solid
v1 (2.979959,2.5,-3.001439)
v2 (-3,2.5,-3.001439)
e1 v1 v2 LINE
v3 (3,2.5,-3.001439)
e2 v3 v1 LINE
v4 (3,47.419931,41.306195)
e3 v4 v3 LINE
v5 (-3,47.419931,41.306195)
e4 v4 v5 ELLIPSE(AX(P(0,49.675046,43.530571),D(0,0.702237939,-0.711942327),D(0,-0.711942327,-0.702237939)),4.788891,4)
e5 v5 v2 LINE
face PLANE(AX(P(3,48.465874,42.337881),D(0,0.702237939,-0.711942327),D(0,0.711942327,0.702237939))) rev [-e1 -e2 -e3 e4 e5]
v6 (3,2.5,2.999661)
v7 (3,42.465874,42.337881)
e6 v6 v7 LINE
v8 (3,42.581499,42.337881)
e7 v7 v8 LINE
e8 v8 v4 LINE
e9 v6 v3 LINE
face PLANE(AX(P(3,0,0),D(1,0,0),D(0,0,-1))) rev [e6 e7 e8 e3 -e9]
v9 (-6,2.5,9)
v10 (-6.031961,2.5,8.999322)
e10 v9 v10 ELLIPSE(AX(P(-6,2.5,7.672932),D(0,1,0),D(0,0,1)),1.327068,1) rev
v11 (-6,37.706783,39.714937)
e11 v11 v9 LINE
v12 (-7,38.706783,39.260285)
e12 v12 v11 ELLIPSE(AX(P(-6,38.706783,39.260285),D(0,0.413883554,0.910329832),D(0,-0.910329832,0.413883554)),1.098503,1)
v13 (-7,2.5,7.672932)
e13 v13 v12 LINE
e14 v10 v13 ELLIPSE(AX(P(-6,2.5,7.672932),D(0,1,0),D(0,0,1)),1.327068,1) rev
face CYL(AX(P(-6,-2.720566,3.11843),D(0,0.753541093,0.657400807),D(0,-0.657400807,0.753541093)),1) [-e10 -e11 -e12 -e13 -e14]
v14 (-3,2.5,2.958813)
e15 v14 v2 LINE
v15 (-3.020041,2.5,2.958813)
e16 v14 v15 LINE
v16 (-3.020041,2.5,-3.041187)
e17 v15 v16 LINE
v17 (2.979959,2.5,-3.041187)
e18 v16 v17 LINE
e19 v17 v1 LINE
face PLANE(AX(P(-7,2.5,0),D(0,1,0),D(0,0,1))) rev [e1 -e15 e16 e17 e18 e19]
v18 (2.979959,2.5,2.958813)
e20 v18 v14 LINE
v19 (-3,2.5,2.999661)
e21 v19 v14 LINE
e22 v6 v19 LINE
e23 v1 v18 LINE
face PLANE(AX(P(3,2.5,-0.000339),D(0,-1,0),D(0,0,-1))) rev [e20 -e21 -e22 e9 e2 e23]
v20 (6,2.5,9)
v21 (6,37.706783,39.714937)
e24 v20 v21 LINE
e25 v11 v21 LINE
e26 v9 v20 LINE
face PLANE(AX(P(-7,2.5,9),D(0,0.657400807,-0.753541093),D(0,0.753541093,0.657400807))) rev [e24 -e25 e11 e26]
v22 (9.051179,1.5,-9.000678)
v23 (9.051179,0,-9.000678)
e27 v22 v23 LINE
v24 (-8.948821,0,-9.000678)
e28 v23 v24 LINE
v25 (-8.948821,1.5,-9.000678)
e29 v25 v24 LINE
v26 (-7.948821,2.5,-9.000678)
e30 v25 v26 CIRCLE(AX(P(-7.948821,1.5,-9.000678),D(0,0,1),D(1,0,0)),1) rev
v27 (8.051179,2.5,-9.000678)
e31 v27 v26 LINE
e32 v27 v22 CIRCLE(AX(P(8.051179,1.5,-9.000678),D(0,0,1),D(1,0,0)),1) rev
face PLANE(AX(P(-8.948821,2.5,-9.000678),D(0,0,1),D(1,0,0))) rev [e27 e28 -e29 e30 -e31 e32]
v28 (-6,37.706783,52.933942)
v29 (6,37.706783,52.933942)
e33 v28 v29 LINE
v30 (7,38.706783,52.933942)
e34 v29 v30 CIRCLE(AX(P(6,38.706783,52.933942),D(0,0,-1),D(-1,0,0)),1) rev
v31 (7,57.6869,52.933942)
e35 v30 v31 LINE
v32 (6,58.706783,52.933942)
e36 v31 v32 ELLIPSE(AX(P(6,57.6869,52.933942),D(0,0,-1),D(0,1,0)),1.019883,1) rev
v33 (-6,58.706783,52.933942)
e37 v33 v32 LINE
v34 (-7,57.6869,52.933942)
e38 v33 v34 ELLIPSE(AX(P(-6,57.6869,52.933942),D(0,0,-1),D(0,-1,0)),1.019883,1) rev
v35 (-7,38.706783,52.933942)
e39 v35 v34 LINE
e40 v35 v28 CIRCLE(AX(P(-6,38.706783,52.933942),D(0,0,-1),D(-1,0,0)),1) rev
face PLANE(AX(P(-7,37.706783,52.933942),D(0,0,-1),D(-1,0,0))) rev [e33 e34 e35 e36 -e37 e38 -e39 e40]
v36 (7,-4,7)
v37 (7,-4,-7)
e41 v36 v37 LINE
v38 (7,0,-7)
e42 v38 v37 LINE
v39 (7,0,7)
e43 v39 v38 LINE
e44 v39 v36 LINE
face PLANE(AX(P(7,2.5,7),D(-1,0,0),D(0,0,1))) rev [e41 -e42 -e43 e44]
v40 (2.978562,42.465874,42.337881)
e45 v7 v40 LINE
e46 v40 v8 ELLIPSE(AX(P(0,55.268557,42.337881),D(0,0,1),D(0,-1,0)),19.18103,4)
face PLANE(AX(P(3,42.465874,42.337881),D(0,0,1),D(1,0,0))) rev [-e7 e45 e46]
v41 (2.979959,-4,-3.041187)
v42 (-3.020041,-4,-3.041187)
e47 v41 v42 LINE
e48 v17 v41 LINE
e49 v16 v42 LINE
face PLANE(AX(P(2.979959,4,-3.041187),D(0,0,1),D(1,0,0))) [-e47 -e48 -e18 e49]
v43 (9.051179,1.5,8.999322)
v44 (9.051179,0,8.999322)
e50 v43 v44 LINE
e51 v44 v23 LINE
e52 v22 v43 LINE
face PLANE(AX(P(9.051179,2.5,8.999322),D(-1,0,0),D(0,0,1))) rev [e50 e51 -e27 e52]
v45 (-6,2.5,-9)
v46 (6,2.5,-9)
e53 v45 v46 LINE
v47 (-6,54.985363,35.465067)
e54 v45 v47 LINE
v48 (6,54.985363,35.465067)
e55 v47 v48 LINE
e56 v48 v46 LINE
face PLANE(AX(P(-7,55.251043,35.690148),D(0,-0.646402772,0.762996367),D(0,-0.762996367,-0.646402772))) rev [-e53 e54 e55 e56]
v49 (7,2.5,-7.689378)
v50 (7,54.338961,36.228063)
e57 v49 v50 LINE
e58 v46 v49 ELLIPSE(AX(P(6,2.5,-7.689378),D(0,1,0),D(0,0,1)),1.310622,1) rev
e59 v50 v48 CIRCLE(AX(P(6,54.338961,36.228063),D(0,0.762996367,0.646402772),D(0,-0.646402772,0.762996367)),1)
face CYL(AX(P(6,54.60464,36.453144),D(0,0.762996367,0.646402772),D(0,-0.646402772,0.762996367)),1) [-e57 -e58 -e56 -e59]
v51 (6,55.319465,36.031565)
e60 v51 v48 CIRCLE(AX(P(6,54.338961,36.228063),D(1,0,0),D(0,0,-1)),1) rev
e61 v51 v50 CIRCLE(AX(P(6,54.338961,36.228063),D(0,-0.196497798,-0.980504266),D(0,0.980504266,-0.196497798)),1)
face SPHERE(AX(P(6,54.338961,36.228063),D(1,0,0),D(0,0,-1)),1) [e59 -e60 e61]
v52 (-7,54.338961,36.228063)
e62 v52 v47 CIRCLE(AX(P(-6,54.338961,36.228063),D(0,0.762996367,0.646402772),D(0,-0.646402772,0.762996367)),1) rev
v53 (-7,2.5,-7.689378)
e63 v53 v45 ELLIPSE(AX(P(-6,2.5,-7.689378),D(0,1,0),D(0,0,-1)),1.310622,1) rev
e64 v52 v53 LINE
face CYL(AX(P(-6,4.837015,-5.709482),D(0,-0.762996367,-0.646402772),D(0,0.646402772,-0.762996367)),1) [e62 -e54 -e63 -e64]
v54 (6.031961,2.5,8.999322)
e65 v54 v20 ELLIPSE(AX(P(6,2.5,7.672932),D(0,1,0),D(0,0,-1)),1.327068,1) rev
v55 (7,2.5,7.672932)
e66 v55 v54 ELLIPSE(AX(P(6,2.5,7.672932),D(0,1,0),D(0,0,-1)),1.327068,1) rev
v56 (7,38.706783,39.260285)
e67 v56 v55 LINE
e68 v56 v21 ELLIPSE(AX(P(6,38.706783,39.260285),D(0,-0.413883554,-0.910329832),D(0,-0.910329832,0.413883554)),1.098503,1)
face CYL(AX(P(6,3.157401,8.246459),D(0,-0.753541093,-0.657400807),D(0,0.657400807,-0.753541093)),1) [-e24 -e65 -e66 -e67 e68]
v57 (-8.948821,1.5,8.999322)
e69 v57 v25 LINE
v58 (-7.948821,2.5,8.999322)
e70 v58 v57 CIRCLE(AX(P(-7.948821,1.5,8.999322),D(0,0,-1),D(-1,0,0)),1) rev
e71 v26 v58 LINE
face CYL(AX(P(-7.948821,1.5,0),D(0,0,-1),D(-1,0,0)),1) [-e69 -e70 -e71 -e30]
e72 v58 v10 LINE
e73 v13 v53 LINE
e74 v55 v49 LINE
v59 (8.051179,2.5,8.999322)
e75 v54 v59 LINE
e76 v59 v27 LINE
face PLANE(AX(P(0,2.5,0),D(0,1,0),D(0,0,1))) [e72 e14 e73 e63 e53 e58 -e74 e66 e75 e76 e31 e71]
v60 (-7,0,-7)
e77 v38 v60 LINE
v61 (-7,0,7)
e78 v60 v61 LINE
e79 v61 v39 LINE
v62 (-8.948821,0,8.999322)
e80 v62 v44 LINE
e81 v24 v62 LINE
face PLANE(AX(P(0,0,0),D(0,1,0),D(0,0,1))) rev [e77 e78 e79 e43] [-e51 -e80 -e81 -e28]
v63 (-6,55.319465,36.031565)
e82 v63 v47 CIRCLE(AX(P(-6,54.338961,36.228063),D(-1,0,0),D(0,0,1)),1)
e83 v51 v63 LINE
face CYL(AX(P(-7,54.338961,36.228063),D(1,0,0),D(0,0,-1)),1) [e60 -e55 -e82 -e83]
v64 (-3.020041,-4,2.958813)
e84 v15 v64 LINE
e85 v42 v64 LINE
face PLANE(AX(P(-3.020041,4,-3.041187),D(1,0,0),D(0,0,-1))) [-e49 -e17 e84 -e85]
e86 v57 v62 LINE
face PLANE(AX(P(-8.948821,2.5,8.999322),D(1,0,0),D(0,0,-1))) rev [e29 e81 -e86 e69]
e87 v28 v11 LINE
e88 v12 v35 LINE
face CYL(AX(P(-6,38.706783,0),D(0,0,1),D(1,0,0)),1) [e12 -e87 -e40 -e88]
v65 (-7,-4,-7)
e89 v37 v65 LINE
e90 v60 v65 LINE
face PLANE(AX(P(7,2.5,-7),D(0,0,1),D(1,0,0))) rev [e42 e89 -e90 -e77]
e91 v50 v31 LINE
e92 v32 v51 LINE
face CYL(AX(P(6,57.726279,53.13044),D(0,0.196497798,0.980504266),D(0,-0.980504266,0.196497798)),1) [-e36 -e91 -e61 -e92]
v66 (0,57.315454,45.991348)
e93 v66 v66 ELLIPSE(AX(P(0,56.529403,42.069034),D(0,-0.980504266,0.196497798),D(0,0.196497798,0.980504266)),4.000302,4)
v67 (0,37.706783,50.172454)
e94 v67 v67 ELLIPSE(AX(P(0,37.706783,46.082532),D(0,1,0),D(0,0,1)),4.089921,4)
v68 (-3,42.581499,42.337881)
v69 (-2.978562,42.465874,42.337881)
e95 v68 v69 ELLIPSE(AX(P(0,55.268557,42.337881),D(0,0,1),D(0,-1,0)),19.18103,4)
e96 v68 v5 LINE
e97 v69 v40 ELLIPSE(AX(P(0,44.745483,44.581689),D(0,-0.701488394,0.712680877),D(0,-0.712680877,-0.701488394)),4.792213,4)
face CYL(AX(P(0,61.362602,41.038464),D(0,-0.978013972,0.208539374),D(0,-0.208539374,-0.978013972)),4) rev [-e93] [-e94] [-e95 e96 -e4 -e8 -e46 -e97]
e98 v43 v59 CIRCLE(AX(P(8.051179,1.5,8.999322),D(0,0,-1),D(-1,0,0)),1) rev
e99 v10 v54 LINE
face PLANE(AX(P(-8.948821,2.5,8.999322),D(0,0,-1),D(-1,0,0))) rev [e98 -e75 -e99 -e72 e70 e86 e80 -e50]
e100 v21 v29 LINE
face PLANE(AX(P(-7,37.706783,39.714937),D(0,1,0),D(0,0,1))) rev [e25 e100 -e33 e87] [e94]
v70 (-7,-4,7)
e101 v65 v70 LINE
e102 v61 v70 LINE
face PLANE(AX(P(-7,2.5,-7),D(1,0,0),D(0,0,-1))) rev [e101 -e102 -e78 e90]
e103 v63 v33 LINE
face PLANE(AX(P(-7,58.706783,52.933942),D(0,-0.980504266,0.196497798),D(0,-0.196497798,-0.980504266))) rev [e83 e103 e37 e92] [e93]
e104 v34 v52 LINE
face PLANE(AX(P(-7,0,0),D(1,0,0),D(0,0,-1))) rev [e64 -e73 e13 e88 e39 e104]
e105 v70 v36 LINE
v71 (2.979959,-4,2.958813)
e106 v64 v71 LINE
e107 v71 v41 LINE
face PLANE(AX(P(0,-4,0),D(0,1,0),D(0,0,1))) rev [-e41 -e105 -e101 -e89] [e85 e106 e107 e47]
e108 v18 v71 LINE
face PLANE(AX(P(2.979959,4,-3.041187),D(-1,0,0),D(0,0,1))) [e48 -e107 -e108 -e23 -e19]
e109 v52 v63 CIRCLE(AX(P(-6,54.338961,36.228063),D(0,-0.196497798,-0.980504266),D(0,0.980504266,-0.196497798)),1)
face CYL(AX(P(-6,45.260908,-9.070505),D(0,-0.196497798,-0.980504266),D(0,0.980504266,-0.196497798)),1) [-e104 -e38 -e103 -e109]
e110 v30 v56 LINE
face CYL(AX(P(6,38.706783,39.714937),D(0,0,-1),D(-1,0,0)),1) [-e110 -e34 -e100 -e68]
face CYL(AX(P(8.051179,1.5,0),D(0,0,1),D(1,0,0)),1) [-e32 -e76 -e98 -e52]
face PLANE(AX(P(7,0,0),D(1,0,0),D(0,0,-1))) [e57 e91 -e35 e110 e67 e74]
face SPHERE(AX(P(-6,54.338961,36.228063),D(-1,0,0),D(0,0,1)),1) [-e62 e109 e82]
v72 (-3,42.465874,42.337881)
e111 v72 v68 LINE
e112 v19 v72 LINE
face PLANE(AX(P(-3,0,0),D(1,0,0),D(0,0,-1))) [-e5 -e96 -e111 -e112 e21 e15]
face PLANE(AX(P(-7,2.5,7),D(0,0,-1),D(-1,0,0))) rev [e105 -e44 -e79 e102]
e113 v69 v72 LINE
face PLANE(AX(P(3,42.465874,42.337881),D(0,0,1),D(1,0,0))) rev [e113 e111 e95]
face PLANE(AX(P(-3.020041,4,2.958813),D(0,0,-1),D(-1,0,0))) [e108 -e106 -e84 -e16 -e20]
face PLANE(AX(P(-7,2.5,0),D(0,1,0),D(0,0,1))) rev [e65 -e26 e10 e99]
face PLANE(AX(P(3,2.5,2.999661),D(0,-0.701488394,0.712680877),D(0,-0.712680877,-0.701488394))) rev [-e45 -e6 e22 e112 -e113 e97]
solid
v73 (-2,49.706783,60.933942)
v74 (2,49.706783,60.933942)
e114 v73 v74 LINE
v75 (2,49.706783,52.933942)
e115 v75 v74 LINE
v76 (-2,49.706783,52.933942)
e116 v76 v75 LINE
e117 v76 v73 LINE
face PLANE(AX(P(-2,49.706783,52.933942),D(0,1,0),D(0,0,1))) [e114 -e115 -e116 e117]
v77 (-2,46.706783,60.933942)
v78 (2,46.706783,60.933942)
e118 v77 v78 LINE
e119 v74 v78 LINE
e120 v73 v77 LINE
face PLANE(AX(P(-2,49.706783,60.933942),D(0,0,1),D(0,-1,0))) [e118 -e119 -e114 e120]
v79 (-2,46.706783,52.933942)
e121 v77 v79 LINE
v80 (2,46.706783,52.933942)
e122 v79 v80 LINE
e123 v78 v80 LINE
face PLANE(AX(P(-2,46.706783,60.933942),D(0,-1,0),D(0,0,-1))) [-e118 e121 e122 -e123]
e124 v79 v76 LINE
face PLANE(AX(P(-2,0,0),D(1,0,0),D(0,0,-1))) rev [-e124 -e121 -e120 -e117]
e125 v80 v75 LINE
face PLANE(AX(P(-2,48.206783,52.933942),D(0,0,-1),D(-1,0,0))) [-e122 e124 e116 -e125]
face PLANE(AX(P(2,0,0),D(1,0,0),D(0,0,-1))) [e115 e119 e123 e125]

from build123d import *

# Parameters (mm, degrees)
BOSS_EXTRUDE1_DEPTH      = 2.5
BOSS_EXTRUDE1_DEPTH_BACK = 4
SKETCH2_W                = 14
SKETCH2_H                = 14
SKETCH11_W               = 18
SKETCH11_H               = 18
BOSS_EXTRUDE4_DEPTH      = 2.5
CUT_EXTRUDE5_DEPTH       = 4
CUT_EXTRUDE5_DEPTH_BACK  = 4
SKETCH3_W                = 6
SKETCH3_H                = 6
BOSS_EXTRUDE5_DEPTH      = 7
BOSS_EXTRUDE5_DEPTH_BACK = 7
CUT_EXTRUDE8_DEPTH       = 3
CUT_EXTRUDE8_DEPTH_BACK  = 3
CUT_SWEEP4_PROFILE_R     = 4
FILLET1_R                = 1
BOSS_EXTRUDE6_DEPTH      = 2
BOSS_EXTRUDE6_DEPTH_BACK = 2


with BuildPart() as part:
    # Sketch2 → Boss-Extrude1 (new, two sides: drawn at the far end of the back side and taken through both)
    with BuildSketch(Plane(origin=(0, 0, 0), x_dir=(1, 0, 0), z_dir=(0, 1, 0)).offset(-BOSS_EXTRUDE1_DEPTH_BACK)):
        Rectangle(SKETCH2_W, SKETCH2_H)
    extrude(amount=BOSS_EXTRUDE1_DEPTH + BOSS_EXTRUDE1_DEPTH_BACK)

    # Sketch11 → Boss-Extrude4 (add)
    with BuildSketch(Plane(origin=(0, 0, 0), x_dir=(1, 0, 0), z_dir=(0, 1, 0))):
        with Locations((0.051179488, 0.000677961)):
            Rectangle(SKETCH11_W, SKETCH11_H)
    extrude(amount=BOSS_EXTRUDE4_DEPTH)

    # Sketch3 → Cut-Extrude5 (cut, two sides: drawn at the far end of the back side and taken through both)
    with BuildSketch(Plane(origin=(0, 0, 0), x_dir=(1, 0, 0), z_dir=(0, 1, 0)).offset(-CUT_EXTRUDE5_DEPTH_BACK)):
        with Locations((-0.020040697, 0.041186537)):
            Rectangle(SKETCH3_W, SKETCH3_H)
    extrude(amount=CUT_EXTRUDE5_DEPTH + CUT_EXTRUDE5_DEPTH_BACK, mode=Mode.SUBTRACT)

    # Sketch13 → Boss-Extrude5 (add, two sides: drawn at the far end of the back side and taken through both)
    with BuildSketch(Plane(origin=(0, 0, 0), x_dir=(0, 0, -1), z_dir=(1, 0, 0)).offset(-BOSS_EXTRUDE5_DEPTH_BACK)):
        Polygon((-39.714937447, 37.706782945), (-52.933941772, 37.706782945), (-52.933941772, 58.706782945), (-35.69014798, 55.251043253), (9, 2.5), (0, 2.5), (-9, 2.5), align=None)
    extrude(amount=BOSS_EXTRUDE5_DEPTH + BOSS_EXTRUDE5_DEPTH_BACK)

    # Sketch16 → Cut-Extrude8 (cut, two sides: drawn at the far end of the back side and taken through both)
    with BuildSketch(Plane(origin=(0, 0, 0), x_dir=(0, 0, -1), z_dir=(1, 0, 0)).offset(-CUT_EXTRUDE8_DEPTH_BACK)):
        Polygon((0.000338981, 2.5), (3.001438968, 2.5), (-42.337880938, 48.465874453), (-42.337880938, 42.465874453), (-2.999661019, 2.5), align=None)
    extrude(amount=CUT_EXTRUDE8_DEPTH + CUT_EXTRUDE8_DEPTH_BACK, mode=Mode.SUBTRACT)

    # Cut-Sweep4: sweep along a path in Sketch52
    with BuildLine(Plane(origin=(0, 0, 0), x_dir=(0, 0, -1), z_dir=(1, 0, 0))) as cut_sweep4_path:
        Line((-41.038463706, 61.362601787), (-48.816572109, 24.884604602))
    # Cut-Sweep4 profile (on start of the path) → Cut-Sweep4 (sweep, cut)
    with BuildSketch(Plane(origin=(0, 61.362601787, 41.038463706), x_dir=(0, -0.20853937389083857, -0.9780139720562366), z_dir=(0, -0.9780139720562366, 0.20853937389083857))):
        Circle(CUT_SWEEP4_PROFILE_R)
    sweep(path=cut_sweep4_path.line, mode=Mode.SUBTRACT)

    # Fillet1
    # the kernel refuses this fillet: 1 mm, written as the material it takes off along each edge
    with BuildSketch(Plane(origin=(6, 54.338960672, 36.228063112), x_dir=(0, 0.6464027717083677, -0.7629963674407237), z_dir=(1, 0, 0))) as fillet1_piece_1_section:
        Polygon((0, 0), (FILLET1_R * 1.02, 0), (FILLET1_R * 1.02, FILLET1_R * 0.355169980491), (FILLET1_R * 0.799402336859, FILLET1_R * 0.633526561262), align=None)
    fillet1_piece_1 = extrude(amount=FILLET1_R * 1.02, mode=Mode.PRIVATE)
    fillet1_piece_1 = fillet1_piece_1 - Plane(origin=(6, 54.338960672, 36.228063112), x_dir=(0, -0.8613575242057089, 0.5079992278480466), z_dir=(1, 0, 0)) * Sphere(FILLET1_R, mode=Mode.PRIVATE)
    add(fillet1_piece_1, mode=Mode.SUBTRACT)
    with BuildSketch(Plane(origin=(-6, 54.338960672, 36.228063112), x_dir=(0, 0.9805042658587001, -0.1964977980357328), z_dir=(-1, 0, 0))) as fillet1_piece_2_section:
        Polygon((0, 0), (FILLET1_R * 1.02, 0), (FILLET1_R * 1.02, FILLET1_R * 0.355169980491), (FILLET1_R * 0.799402336859, FILLET1_R * 0.633526561262), align=None)
    fillet1_piece_2 = extrude(amount=FILLET1_R * 1.02, mode=Mode.PRIVATE)
    fillet1_piece_2 = fillet1_piece_2 - Plane(origin=(-6, 54.338960672, 36.228063112), x_dir=(0, -0.8613575242057089, 0.5079992278480466), z_dir=(-1, 0, 0)) * Sphere(FILLET1_R, mode=Mode.PRIVATE)
    add(fillet1_piece_2, mode=Mode.SUBTRACT)
    with BuildSketch(Plane(origin=(-8.948820512, 2.5, 8.999322039), x_dir=(1, 0, 0), z_dir=(0, 0, -1)), Plane(origin=(9.051179488, 2.5, -9.000677961), x_dir=(-1, 0, 0), z_dir=(0, 0, 1))) as fillet1_piece_3:
        with BuildLine():
            CenterArc((FILLET1_R, FILLET1_R), FILLET1_R, 180, 90)
            Line((0, FILLET1_R), (-FILLET1_R * 0.02, FILLET1_R))
            Line((-FILLET1_R * 0.02, FILLET1_R), (-FILLET1_R * 0.02, -FILLET1_R * 0.02))
            Line((-FILLET1_R * 0.02, -FILLET1_R * 0.02), (FILLET1_R, -FILLET1_R * 0.02))
            Line((FILLET1_R, -FILLET1_R * 0.02), (FILLET1_R, 0))
        make_face()
    extrude(amount=18, mode=Mode.SUBTRACT)
    with BuildSketch(Plane(origin=(7, 0.616147268, 7.356497982), x_dir=(0, 0.6574008072827306, -0.7535410928303872), z_dir=(0, 0.7535410928303872, 0.6574008072827306))) as fillet1_piece_4_section:
        with BuildLine():
            CenterArc((FILLET1_R, FILLET1_R), FILLET1_R, 180, 90)
            Line((0, FILLET1_R), (-FILLET1_R * 0.02, FILLET1_R))
            Line((-FILLET1_R * 0.02, FILLET1_R), (-FILLET1_R * 0.02, -FILLET1_R * 0.02))
            Line((-FILLET1_R * 0.02, -FILLET1_R * 0.02), (FILLET1_R, -FILLET1_R * 0.02))
            Line((FILLET1_R, -FILLET1_R * 0.02), (FILLET1_R, 0))
        make_face()
    fillet1_piece_4 = extrude(amount=51.721782368, mode=Mode.PRIVATE)
    fillet1_piece_4 = split(fillet1_piece_4, bisect_by=Plane(origin=(6.773604886, 2.5, 24.057027094), z_dir=(0, 1, 0)), keep=Keep.TOP, mode=Mode.PRIVATE)
    fillet1_piece_4 = split(fillet1_piece_4, bisect_by=Plane(origin=(6.773604886, 37.706782945, 24.057027094), z_dir=(0, -1, 0)), keep=Keep.TOP, mode=Mode.PRIVATE)
    add(fillet1_piece_4, mode=Mode.SUBTRACT)
    with BuildSketch(Plane(origin=(7, 37.706782945, 37.214937447), x_dir=(0, 1, 0), z_dir=(0, 0, 1))) as fillet1_piece_5_section:
        with BuildLine():
            CenterArc((FILLET1_R, FILLET1_R), FILLET1_R, 180, 90)
            Line((0, FILLET1_R), (-FILLET1_R * 0.02, FILLET1_R))
            Line((-FILLET1_R * 0.02, FILLET1_R), (-FILLET1_R * 0.02, -FILLET1_R * 0.02))
            Line((-FILLET1_R * 0.02, -FILLET1_R * 0.02), (FILLET1_R, -FILLET1_R * 0.02))
            Line((FILLET1_R, -FILLET1_R * 0.02), (FILLET1_R, 0))
        make_face()
    fillet1_piece_5 = extrude(amount=15.719004325, mode=Mode.PRIVATE)
    fillet1_piece_5 = split(fillet1_piece_5, bisect_by=Plane(origin=(6.771765338, 41.156021247, 42.724105847), z_dir=(0, -0.6574008072827306, 0.7535410928303872)), keep=Keep.TOP, mode=Mode.PRIVATE)
    add(fillet1_piece_5, mode=Mode.SUBTRACT)
    with BuildSketch(Plane(origin=(7, 59.19802744, 55.385202437), x_dir=(0, -0.9805042658587001, 0.1964977980357328), z_dir=(0, -0.1964977980357328, -0.9805042658587001))) as fillet1_piece_6_section:
        with BuildLine():
            CenterArc((FILLET1_R, FILLET1_R), FILLET1_R, 180, 90)
            Line((0, FILLET1_R), (-FILLET1_R * 0.02, FILLET1_R))
            Line((-FILLET1_R * 0.02, FILLET1_R), (-FILLET1_R * 0.02, -FILLET1_R * 0.02))
            Line((-FILLET1_R * 0.02, -FILLET1_R * 0.02), (FILLET1_R, -FILLET1_R * 0.02))
            Line((FILLET1_R, -FILLET1_R * 0.02), (FILLET1_R, 0))
        make_face()
    fillet1_piece_6 = extrude(amount=19.738452749, mode=Mode.PRIVATE)
    fillet1_piece_6 = split(fillet1_piece_6, bisect_by=Plane(origin=(6.773284847, 56.78722679, 52.933941772), z_dir=(0, 0, -1)), keep=Keep.TOP, mode=Mode.PRIVATE)
    add(fillet1_piece_6, mode=Mode.SUBTRACT)
    with BuildSketch(Plane(origin=(6, 55.251043253, 35.69014798), x_dir=(0, -0.762996367440723, -0.6464027717083685), z_dir=(-1, 0, 0))) as fillet1_piece_7:
        with BuildLine():
            CenterArc((FILLET1_R * 0.348205863226, FILLET1_R), FILLET1_R, 231.603166209, 38.396833791)
            Line((-FILLET1_R * 0.272898608599, FILLET1_R * 0.216272218766), (-FILLET1_R * 0.285320698036, FILLET1_R * 0.200597663141))
            Line((-FILLET1_R * 0.285320698036, FILLET1_R * 0.200597663141), (-FILLET1_R * 0.00696411726452, -FILLET1_R * 0.02))
            Line((-FILLET1_R * 0.00696411726452, -FILLET1_R * 0.02), (FILLET1_R * 0.348205863226, -FILLET1_R * 0.02))
            Line((FILLET1_R * 0.348205863226, -FILLET1_R * 0.02), (FILLET1_R * 0.348205863226, 0))
        make_face()
    extrude(amount=12, mode=Mode.SUBTRACT)
    with BuildSketch(Plane(origin=(7, 54.985363444, 35.465066745), x_dir=(0, -0.6464027717083677, 0.7629963674407237), z_dir=(0, -0.7629963674407237, -0.6464027717083677))) as fillet1_piece_8_section:
        with BuildLine():
            CenterArc((FILLET1_R, FILLET1_R), FILLET1_R, 180, 90)
            Line((0, FILLET1_R), (-FILLET1_R * 0.02, FILLET1_R))
            Line((-FILLET1_R * 0.02, FILLET1_R), (-FILLET1_R * 0.02, -FILLET1_R * 0.02))
            Line((-FILLET1_R * 0.02, -FILLET1_R * 0.02), (FILLET1_R, -FILLET1_R * 0.02))
            Line((FILLET1_R, -FILLET1_R * 0.02), (FILLET1_R, 0))
        make_face()
    fillet1_piece_8 = extrude(amount=71.28848404, mode=Mode.PRIVATE)
    fillet1_piece_8 = split(fillet1_piece_8, bisect_by=Plane(origin=(6.773265787, 2.5, 13.466666803), z_dir=(0, 1, 0)), keep=Keep.TOP, mode=Mode.PRIVATE)
    add(fillet1_piece_8, mode=Mode.SUBTRACT)
    with BuildSketch(Plane(origin=(-7, 0.616147268, 7.356497982), x_dir=(0, 0.6574008072827306, -0.7535410928303872), z_dir=(0, 0.7535410928303872, 0.6574008072827306))) as fillet1_piece_9_section:
        with BuildLine():
            CenterArc((FILLET1_R, -FILLET1_R), FILLET1_R, 90, 90)
            Line((0, -FILLET1_R), (-FILLET1_R * 0.02, -FILLET1_R))
            Line((-FILLET1_R * 0.02, -FILLET1_R), (-FILLET1_R * 0.02, FILLET1_R * 0.02))
            Line((-FILLET1_R * 0.02, FILLET1_R * 0.02), (FILLET1_R, FILLET1_R * 0.02))
            Line((FILLET1_R, FILLET1_R * 0.02), (FILLET1_R, 0))
        make_face()
    fillet1_piece_9 = extrude(amount=51.721782368, mode=Mode.PRIVATE)
    fillet1_piece_9 = split(fillet1_piece_9, bisect_by=Plane(origin=(-6.773604886, 2.5, 24.057027094), z_dir=(0, 1, 0)), keep=Keep.TOP, mode=Mode.PRIVATE)
    fillet1_piece_9 = split(fillet1_piece_9, bisect_by=Plane(origin=(-6.773604886, 37.706782945, 24.057027094), z_dir=(0, -1, 0)), keep=Keep.TOP, mode=Mode.PRIVATE)
    add(fillet1_piece_9, mode=Mode.SUBTRACT)
    with BuildSketch(Plane(origin=(-7, 37.706782945, 37.214937447), x_dir=(0, 1, 0), z_dir=(0, 0, 1))) as fillet1_piece_10_section:
        with BuildLine():
            CenterArc((FILLET1_R, -FILLET1_R), FILLET1_R, 90, 90)
            Line((0, -FILLET1_R), (-FILLET1_R * 0.02, -FILLET1_R))
            Line((-FILLET1_R * 0.02, -FILLET1_R), (-FILLET1_R * 0.02, FILLET1_R * 0.02))
            Line((-FILLET1_R * 0.02, FILLET1_R * 0.02), (FILLET1_R, FILLET1_R * 0.02))
            Line((FILLET1_R, FILLET1_R * 0.02), (FILLET1_R, 0))
        make_face()
    fillet1_piece_10 = extrude(amount=15.719004325, mode=Mode.PRIVATE)
    fillet1_piece_10 = split(fillet1_piece_10, bisect_by=Plane(origin=(-6.771765338, 41.156021247, 42.724105847), z_dir=(0, -0.6574008072827306, 0.7535410928303872)), keep=Keep.TOP, mode=Mode.PRIVATE)
    add(fillet1_piece_10, mode=Mode.SUBTRACT)
    with BuildSketch(Plane(origin=(-7, 59.19802744, 55.385202437), x_dir=(0, -0.9805042658587001, 0.1964977980357328), z_dir=(0, -0.1964977980357328, -0.9805042658587001))) as fillet1_piece_11_section:
        with BuildLine():
            CenterArc((FILLET1_R, -FILLET1_R), FILLET1_R, 90, 90)
            Line((0, -FILLET1_R), (-FILLET1_R * 0.02, -FILLET1_R))
            Line((-FILLET1_R * 0.02, -FILLET1_R), (-FILLET1_R * 0.02, FILLET1_R * 0.02))
            Line((-FILLET1_R * 0.02, FILLET1_R * 0.02), (FILLET1_R, FILLET1_R * 0.02))
            Line((FILLET1_R, FILLET1_R * 0.02), (FILLET1_R, 0))
        make_face()
    fillet1_piece_11 = extrude(amount=19.738452749, mode=Mode.PRIVATE)
    fillet1_piece_11 = split(fillet1_piece_11, bisect_by=Plane(origin=(-6.773284847, 56.78722679, 52.933941772), z_dir=(0, 0, -1)), keep=Keep.TOP, mode=Mode.PRIVATE)
    add(fillet1_piece_11, mode=Mode.SUBTRACT)
    with BuildSketch(Plane(origin=(-7, 54.985363444, 35.465066745), x_dir=(1, 0, 0), z_dir=(0, -0.7629963674407237, -0.6464027717083677))) as fillet1_piece_12_section:
        with BuildLine():
            CenterArc((FILLET1_R, FILLET1_R), FILLET1_R, 180, 90)
            Line((0, FILLET1_R), (-FILLET1_R * 0.02, FILLET1_R))
            Line((-FILLET1_R * 0.02, FILLET1_R), (-FILLET1_R * 0.02, -FILLET1_R * 0.02))
            Line((-FILLET1_R * 0.02, -FILLET1_R * 0.02), (FILLET1_R, -FILLET1_R * 0.02))
            Line((FILLET1_R, -FILLET1_R * 0.02), (FILLET1_R, 0))
        make_face()
    fillet1_piece_12 = extrude(amount=71.28848404, mode=Mode.PRIVATE)
    fillet1_piece_12 = split(fillet1_piece_12, bisect_by=Plane(origin=(-6.773265787, 2.5, 13.466666803), z_dir=(0, 1, 0)), keep=Keep.TOP, mode=Mode.PRIVATE)
    add(fillet1_piece_12, mode=Mode.SUBTRACT)
    with BuildSketch(Plane(origin=(7, 37.706782945, 37.214937447), x_dir=(0, 1, 0), z_dir=(0, 0, 1))) as fillet1_piece_13a_section:
        with BuildLine():
            CenterArc((FILLET1_R, FILLET1_R), FILLET1_R, 180, 90)
            Line((0, FILLET1_R), (-FILLET1_R * 0.02, FILLET1_R))
            Line((-FILLET1_R * 0.02, FILLET1_R), (-FILLET1_R * 0.02, -FILLET1_R * 0.02))
            Line((-FILLET1_R * 0.02, -FILLET1_R * 0.02), (FILLET1_R, -FILLET1_R * 0.02))
            Line((FILLET1_R, -FILLET1_R * 0.02), (FILLET1_R, 0))
        make_face()
    fillet1_piece_13a = extrude(amount=15.719004325, mode=Mode.PRIVATE)
    fillet1_piece_13a = split(fillet1_piece_13a, bisect_by=Plane(origin=(6.782484797, 37.27681683, 39.339828413), z_dir=(0, 0.6574008072827306, -0.7535410928303872)), keep=Keep.TOP, mode=Mode.PRIVATE)
    with BuildSketch(Plane(origin=(7, 0.616147268, 7.356497982), x_dir=(0, 0.6574008072827306, -0.7535410928303872), z_dir=(0, 0.7535410928303872, 0.6574008072827306))) as fillet1_piece_13b_section:
        with BuildLine():
            CenterArc((FILLET1_R, FILLET1_R), FILLET1_R, 180, 90)
            Line((0, FILLET1_R), (-FILLET1_R * 0.02, FILLET1_R))
            Line((-FILLET1_R * 0.02, FILLET1_R), (-FILLET1_R * 0.02, -FILLET1_R * 0.02))
            Line((-FILLET1_R * 0.02, -FILLET1_R * 0.02), (FILLET1_R, -FILLET1_R * 0.02))
            Line((FILLET1_R, -FILLET1_R * 0.02), (FILLET1_R, 0))
        make_face()
    fillet1_piece_13b = extrude(amount=51.721782368, mode=Mode.PRIVATE)
    fillet1_piece_13b = split(fillet1_piece_13b, bisect_by=Plane(origin=(6.782484797, 37.706782945, 40.285531565), z_dir=(0, 1, 0)), keep=Keep.TOP, mode=Mode.PRIVATE)
    fillet1_piece_13 = fillet1_piece_13a & fillet1_piece_13b
    add(fillet1_piece_13, mode=Mode.SUBTRACT)
    with BuildSketch(Plane(origin=(-7, 37.706782945, 37.214937447), x_dir=(0, 1, 0), z_dir=(0, 0, 1))) as fillet1_piece_14a_section:
        with BuildLine():
            CenterArc((FILLET1_R, -FILLET1_R), FILLET1_R, 90, 90)
            Line((0, -FILLET1_R), (-FILLET1_R * 0.02, -FILLET1_R))
            Line((-FILLET1_R * 0.02, -FILLET1_R), (-FILLET1_R * 0.02, FILLET1_R * 0.02))
            Line((-FILLET1_R * 0.02, FILLET1_R * 0.02), (FILLET1_R, FILLET1_R * 0.02))
            Line((FILLET1_R, FILLET1_R * 0.02), (FILLET1_R, 0))
        make_face()
    fillet1_piece_14a = extrude(amount=15.719004325, mode=Mode.PRIVATE)
    fillet1_piece_14a = split(fillet1_piece_14a, bisect_by=Plane(origin=(-6.782484797, 37.27681683, 39.339828413), z_dir=(0, 0.6574008072827306, -0.7535410928303872)), keep=Keep.TOP, mode=Mode.PRIVATE)
    with BuildSketch(Plane(origin=(-7, 0.616147268, 7.356497982), x_dir=(0, 0.6574008072827306, -0.7535410928303872), z_dir=(0, 0.7535410928303872, 0.6574008072827306))) as fillet1_piece_14b_section:
        with BuildLine():
            CenterArc((FILLET1_R, -FILLET1_R), FILLET1_R, 90, 90)
            Line((0, -FILLET1_R), (-FILLET1_R * 0.02, -FILLET1_R))
            Line((-FILLET1_R * 0.02, -FILLET1_R), (-FILLET1_R * 0.02, FILLET1_R * 0.02))
            Line((-FILLET1_R * 0.02, FILLET1_R * 0.02), (FILLET1_R, FILLET1_R * 0.02))
            Line((FILLET1_R, FILLET1_R * 0.02), (FILLET1_R, 0))
        make_face()
    fillet1_piece_14b = extrude(amount=51.721782368, mode=Mode.PRIVATE)
    fillet1_piece_14b = split(fillet1_piece_14b, bisect_by=Plane(origin=(-6.782484797, 37.706782945, 40.285531565), z_dir=(0, 1, 0)), keep=Keep.TOP, mode=Mode.PRIVATE)
    fillet1_piece_14 = fillet1_piece_14a & fillet1_piece_14b
    add(fillet1_piece_14, mode=Mode.SUBTRACT)


with BuildPart() as body_2:
    # Sketch59 → Boss-Extrude6 (new, two sides: drawn at the far end of the back side and taken through both)
    with BuildSketch(Plane(origin=(0, 0, 0), x_dir=(0, 0, -1), z_dir=(1, 0, 0)).offset(-BOSS_EXTRUDE6_DEPTH_BACK)):
        Polygon((-52.933941772, 48.206782945), (-52.933941772, 49.706782945), (-60.933941772, 49.706782945), (-60.933941772, 46.706782945), (-52.933941772, 46.706782945), align=None)
    extrude(amount=BOSS_EXTRUDE6_DEPTH + BOSS_EXTRUDE6_DEPTH_BACK)


solid = Compound([part.part, body_2.part])
